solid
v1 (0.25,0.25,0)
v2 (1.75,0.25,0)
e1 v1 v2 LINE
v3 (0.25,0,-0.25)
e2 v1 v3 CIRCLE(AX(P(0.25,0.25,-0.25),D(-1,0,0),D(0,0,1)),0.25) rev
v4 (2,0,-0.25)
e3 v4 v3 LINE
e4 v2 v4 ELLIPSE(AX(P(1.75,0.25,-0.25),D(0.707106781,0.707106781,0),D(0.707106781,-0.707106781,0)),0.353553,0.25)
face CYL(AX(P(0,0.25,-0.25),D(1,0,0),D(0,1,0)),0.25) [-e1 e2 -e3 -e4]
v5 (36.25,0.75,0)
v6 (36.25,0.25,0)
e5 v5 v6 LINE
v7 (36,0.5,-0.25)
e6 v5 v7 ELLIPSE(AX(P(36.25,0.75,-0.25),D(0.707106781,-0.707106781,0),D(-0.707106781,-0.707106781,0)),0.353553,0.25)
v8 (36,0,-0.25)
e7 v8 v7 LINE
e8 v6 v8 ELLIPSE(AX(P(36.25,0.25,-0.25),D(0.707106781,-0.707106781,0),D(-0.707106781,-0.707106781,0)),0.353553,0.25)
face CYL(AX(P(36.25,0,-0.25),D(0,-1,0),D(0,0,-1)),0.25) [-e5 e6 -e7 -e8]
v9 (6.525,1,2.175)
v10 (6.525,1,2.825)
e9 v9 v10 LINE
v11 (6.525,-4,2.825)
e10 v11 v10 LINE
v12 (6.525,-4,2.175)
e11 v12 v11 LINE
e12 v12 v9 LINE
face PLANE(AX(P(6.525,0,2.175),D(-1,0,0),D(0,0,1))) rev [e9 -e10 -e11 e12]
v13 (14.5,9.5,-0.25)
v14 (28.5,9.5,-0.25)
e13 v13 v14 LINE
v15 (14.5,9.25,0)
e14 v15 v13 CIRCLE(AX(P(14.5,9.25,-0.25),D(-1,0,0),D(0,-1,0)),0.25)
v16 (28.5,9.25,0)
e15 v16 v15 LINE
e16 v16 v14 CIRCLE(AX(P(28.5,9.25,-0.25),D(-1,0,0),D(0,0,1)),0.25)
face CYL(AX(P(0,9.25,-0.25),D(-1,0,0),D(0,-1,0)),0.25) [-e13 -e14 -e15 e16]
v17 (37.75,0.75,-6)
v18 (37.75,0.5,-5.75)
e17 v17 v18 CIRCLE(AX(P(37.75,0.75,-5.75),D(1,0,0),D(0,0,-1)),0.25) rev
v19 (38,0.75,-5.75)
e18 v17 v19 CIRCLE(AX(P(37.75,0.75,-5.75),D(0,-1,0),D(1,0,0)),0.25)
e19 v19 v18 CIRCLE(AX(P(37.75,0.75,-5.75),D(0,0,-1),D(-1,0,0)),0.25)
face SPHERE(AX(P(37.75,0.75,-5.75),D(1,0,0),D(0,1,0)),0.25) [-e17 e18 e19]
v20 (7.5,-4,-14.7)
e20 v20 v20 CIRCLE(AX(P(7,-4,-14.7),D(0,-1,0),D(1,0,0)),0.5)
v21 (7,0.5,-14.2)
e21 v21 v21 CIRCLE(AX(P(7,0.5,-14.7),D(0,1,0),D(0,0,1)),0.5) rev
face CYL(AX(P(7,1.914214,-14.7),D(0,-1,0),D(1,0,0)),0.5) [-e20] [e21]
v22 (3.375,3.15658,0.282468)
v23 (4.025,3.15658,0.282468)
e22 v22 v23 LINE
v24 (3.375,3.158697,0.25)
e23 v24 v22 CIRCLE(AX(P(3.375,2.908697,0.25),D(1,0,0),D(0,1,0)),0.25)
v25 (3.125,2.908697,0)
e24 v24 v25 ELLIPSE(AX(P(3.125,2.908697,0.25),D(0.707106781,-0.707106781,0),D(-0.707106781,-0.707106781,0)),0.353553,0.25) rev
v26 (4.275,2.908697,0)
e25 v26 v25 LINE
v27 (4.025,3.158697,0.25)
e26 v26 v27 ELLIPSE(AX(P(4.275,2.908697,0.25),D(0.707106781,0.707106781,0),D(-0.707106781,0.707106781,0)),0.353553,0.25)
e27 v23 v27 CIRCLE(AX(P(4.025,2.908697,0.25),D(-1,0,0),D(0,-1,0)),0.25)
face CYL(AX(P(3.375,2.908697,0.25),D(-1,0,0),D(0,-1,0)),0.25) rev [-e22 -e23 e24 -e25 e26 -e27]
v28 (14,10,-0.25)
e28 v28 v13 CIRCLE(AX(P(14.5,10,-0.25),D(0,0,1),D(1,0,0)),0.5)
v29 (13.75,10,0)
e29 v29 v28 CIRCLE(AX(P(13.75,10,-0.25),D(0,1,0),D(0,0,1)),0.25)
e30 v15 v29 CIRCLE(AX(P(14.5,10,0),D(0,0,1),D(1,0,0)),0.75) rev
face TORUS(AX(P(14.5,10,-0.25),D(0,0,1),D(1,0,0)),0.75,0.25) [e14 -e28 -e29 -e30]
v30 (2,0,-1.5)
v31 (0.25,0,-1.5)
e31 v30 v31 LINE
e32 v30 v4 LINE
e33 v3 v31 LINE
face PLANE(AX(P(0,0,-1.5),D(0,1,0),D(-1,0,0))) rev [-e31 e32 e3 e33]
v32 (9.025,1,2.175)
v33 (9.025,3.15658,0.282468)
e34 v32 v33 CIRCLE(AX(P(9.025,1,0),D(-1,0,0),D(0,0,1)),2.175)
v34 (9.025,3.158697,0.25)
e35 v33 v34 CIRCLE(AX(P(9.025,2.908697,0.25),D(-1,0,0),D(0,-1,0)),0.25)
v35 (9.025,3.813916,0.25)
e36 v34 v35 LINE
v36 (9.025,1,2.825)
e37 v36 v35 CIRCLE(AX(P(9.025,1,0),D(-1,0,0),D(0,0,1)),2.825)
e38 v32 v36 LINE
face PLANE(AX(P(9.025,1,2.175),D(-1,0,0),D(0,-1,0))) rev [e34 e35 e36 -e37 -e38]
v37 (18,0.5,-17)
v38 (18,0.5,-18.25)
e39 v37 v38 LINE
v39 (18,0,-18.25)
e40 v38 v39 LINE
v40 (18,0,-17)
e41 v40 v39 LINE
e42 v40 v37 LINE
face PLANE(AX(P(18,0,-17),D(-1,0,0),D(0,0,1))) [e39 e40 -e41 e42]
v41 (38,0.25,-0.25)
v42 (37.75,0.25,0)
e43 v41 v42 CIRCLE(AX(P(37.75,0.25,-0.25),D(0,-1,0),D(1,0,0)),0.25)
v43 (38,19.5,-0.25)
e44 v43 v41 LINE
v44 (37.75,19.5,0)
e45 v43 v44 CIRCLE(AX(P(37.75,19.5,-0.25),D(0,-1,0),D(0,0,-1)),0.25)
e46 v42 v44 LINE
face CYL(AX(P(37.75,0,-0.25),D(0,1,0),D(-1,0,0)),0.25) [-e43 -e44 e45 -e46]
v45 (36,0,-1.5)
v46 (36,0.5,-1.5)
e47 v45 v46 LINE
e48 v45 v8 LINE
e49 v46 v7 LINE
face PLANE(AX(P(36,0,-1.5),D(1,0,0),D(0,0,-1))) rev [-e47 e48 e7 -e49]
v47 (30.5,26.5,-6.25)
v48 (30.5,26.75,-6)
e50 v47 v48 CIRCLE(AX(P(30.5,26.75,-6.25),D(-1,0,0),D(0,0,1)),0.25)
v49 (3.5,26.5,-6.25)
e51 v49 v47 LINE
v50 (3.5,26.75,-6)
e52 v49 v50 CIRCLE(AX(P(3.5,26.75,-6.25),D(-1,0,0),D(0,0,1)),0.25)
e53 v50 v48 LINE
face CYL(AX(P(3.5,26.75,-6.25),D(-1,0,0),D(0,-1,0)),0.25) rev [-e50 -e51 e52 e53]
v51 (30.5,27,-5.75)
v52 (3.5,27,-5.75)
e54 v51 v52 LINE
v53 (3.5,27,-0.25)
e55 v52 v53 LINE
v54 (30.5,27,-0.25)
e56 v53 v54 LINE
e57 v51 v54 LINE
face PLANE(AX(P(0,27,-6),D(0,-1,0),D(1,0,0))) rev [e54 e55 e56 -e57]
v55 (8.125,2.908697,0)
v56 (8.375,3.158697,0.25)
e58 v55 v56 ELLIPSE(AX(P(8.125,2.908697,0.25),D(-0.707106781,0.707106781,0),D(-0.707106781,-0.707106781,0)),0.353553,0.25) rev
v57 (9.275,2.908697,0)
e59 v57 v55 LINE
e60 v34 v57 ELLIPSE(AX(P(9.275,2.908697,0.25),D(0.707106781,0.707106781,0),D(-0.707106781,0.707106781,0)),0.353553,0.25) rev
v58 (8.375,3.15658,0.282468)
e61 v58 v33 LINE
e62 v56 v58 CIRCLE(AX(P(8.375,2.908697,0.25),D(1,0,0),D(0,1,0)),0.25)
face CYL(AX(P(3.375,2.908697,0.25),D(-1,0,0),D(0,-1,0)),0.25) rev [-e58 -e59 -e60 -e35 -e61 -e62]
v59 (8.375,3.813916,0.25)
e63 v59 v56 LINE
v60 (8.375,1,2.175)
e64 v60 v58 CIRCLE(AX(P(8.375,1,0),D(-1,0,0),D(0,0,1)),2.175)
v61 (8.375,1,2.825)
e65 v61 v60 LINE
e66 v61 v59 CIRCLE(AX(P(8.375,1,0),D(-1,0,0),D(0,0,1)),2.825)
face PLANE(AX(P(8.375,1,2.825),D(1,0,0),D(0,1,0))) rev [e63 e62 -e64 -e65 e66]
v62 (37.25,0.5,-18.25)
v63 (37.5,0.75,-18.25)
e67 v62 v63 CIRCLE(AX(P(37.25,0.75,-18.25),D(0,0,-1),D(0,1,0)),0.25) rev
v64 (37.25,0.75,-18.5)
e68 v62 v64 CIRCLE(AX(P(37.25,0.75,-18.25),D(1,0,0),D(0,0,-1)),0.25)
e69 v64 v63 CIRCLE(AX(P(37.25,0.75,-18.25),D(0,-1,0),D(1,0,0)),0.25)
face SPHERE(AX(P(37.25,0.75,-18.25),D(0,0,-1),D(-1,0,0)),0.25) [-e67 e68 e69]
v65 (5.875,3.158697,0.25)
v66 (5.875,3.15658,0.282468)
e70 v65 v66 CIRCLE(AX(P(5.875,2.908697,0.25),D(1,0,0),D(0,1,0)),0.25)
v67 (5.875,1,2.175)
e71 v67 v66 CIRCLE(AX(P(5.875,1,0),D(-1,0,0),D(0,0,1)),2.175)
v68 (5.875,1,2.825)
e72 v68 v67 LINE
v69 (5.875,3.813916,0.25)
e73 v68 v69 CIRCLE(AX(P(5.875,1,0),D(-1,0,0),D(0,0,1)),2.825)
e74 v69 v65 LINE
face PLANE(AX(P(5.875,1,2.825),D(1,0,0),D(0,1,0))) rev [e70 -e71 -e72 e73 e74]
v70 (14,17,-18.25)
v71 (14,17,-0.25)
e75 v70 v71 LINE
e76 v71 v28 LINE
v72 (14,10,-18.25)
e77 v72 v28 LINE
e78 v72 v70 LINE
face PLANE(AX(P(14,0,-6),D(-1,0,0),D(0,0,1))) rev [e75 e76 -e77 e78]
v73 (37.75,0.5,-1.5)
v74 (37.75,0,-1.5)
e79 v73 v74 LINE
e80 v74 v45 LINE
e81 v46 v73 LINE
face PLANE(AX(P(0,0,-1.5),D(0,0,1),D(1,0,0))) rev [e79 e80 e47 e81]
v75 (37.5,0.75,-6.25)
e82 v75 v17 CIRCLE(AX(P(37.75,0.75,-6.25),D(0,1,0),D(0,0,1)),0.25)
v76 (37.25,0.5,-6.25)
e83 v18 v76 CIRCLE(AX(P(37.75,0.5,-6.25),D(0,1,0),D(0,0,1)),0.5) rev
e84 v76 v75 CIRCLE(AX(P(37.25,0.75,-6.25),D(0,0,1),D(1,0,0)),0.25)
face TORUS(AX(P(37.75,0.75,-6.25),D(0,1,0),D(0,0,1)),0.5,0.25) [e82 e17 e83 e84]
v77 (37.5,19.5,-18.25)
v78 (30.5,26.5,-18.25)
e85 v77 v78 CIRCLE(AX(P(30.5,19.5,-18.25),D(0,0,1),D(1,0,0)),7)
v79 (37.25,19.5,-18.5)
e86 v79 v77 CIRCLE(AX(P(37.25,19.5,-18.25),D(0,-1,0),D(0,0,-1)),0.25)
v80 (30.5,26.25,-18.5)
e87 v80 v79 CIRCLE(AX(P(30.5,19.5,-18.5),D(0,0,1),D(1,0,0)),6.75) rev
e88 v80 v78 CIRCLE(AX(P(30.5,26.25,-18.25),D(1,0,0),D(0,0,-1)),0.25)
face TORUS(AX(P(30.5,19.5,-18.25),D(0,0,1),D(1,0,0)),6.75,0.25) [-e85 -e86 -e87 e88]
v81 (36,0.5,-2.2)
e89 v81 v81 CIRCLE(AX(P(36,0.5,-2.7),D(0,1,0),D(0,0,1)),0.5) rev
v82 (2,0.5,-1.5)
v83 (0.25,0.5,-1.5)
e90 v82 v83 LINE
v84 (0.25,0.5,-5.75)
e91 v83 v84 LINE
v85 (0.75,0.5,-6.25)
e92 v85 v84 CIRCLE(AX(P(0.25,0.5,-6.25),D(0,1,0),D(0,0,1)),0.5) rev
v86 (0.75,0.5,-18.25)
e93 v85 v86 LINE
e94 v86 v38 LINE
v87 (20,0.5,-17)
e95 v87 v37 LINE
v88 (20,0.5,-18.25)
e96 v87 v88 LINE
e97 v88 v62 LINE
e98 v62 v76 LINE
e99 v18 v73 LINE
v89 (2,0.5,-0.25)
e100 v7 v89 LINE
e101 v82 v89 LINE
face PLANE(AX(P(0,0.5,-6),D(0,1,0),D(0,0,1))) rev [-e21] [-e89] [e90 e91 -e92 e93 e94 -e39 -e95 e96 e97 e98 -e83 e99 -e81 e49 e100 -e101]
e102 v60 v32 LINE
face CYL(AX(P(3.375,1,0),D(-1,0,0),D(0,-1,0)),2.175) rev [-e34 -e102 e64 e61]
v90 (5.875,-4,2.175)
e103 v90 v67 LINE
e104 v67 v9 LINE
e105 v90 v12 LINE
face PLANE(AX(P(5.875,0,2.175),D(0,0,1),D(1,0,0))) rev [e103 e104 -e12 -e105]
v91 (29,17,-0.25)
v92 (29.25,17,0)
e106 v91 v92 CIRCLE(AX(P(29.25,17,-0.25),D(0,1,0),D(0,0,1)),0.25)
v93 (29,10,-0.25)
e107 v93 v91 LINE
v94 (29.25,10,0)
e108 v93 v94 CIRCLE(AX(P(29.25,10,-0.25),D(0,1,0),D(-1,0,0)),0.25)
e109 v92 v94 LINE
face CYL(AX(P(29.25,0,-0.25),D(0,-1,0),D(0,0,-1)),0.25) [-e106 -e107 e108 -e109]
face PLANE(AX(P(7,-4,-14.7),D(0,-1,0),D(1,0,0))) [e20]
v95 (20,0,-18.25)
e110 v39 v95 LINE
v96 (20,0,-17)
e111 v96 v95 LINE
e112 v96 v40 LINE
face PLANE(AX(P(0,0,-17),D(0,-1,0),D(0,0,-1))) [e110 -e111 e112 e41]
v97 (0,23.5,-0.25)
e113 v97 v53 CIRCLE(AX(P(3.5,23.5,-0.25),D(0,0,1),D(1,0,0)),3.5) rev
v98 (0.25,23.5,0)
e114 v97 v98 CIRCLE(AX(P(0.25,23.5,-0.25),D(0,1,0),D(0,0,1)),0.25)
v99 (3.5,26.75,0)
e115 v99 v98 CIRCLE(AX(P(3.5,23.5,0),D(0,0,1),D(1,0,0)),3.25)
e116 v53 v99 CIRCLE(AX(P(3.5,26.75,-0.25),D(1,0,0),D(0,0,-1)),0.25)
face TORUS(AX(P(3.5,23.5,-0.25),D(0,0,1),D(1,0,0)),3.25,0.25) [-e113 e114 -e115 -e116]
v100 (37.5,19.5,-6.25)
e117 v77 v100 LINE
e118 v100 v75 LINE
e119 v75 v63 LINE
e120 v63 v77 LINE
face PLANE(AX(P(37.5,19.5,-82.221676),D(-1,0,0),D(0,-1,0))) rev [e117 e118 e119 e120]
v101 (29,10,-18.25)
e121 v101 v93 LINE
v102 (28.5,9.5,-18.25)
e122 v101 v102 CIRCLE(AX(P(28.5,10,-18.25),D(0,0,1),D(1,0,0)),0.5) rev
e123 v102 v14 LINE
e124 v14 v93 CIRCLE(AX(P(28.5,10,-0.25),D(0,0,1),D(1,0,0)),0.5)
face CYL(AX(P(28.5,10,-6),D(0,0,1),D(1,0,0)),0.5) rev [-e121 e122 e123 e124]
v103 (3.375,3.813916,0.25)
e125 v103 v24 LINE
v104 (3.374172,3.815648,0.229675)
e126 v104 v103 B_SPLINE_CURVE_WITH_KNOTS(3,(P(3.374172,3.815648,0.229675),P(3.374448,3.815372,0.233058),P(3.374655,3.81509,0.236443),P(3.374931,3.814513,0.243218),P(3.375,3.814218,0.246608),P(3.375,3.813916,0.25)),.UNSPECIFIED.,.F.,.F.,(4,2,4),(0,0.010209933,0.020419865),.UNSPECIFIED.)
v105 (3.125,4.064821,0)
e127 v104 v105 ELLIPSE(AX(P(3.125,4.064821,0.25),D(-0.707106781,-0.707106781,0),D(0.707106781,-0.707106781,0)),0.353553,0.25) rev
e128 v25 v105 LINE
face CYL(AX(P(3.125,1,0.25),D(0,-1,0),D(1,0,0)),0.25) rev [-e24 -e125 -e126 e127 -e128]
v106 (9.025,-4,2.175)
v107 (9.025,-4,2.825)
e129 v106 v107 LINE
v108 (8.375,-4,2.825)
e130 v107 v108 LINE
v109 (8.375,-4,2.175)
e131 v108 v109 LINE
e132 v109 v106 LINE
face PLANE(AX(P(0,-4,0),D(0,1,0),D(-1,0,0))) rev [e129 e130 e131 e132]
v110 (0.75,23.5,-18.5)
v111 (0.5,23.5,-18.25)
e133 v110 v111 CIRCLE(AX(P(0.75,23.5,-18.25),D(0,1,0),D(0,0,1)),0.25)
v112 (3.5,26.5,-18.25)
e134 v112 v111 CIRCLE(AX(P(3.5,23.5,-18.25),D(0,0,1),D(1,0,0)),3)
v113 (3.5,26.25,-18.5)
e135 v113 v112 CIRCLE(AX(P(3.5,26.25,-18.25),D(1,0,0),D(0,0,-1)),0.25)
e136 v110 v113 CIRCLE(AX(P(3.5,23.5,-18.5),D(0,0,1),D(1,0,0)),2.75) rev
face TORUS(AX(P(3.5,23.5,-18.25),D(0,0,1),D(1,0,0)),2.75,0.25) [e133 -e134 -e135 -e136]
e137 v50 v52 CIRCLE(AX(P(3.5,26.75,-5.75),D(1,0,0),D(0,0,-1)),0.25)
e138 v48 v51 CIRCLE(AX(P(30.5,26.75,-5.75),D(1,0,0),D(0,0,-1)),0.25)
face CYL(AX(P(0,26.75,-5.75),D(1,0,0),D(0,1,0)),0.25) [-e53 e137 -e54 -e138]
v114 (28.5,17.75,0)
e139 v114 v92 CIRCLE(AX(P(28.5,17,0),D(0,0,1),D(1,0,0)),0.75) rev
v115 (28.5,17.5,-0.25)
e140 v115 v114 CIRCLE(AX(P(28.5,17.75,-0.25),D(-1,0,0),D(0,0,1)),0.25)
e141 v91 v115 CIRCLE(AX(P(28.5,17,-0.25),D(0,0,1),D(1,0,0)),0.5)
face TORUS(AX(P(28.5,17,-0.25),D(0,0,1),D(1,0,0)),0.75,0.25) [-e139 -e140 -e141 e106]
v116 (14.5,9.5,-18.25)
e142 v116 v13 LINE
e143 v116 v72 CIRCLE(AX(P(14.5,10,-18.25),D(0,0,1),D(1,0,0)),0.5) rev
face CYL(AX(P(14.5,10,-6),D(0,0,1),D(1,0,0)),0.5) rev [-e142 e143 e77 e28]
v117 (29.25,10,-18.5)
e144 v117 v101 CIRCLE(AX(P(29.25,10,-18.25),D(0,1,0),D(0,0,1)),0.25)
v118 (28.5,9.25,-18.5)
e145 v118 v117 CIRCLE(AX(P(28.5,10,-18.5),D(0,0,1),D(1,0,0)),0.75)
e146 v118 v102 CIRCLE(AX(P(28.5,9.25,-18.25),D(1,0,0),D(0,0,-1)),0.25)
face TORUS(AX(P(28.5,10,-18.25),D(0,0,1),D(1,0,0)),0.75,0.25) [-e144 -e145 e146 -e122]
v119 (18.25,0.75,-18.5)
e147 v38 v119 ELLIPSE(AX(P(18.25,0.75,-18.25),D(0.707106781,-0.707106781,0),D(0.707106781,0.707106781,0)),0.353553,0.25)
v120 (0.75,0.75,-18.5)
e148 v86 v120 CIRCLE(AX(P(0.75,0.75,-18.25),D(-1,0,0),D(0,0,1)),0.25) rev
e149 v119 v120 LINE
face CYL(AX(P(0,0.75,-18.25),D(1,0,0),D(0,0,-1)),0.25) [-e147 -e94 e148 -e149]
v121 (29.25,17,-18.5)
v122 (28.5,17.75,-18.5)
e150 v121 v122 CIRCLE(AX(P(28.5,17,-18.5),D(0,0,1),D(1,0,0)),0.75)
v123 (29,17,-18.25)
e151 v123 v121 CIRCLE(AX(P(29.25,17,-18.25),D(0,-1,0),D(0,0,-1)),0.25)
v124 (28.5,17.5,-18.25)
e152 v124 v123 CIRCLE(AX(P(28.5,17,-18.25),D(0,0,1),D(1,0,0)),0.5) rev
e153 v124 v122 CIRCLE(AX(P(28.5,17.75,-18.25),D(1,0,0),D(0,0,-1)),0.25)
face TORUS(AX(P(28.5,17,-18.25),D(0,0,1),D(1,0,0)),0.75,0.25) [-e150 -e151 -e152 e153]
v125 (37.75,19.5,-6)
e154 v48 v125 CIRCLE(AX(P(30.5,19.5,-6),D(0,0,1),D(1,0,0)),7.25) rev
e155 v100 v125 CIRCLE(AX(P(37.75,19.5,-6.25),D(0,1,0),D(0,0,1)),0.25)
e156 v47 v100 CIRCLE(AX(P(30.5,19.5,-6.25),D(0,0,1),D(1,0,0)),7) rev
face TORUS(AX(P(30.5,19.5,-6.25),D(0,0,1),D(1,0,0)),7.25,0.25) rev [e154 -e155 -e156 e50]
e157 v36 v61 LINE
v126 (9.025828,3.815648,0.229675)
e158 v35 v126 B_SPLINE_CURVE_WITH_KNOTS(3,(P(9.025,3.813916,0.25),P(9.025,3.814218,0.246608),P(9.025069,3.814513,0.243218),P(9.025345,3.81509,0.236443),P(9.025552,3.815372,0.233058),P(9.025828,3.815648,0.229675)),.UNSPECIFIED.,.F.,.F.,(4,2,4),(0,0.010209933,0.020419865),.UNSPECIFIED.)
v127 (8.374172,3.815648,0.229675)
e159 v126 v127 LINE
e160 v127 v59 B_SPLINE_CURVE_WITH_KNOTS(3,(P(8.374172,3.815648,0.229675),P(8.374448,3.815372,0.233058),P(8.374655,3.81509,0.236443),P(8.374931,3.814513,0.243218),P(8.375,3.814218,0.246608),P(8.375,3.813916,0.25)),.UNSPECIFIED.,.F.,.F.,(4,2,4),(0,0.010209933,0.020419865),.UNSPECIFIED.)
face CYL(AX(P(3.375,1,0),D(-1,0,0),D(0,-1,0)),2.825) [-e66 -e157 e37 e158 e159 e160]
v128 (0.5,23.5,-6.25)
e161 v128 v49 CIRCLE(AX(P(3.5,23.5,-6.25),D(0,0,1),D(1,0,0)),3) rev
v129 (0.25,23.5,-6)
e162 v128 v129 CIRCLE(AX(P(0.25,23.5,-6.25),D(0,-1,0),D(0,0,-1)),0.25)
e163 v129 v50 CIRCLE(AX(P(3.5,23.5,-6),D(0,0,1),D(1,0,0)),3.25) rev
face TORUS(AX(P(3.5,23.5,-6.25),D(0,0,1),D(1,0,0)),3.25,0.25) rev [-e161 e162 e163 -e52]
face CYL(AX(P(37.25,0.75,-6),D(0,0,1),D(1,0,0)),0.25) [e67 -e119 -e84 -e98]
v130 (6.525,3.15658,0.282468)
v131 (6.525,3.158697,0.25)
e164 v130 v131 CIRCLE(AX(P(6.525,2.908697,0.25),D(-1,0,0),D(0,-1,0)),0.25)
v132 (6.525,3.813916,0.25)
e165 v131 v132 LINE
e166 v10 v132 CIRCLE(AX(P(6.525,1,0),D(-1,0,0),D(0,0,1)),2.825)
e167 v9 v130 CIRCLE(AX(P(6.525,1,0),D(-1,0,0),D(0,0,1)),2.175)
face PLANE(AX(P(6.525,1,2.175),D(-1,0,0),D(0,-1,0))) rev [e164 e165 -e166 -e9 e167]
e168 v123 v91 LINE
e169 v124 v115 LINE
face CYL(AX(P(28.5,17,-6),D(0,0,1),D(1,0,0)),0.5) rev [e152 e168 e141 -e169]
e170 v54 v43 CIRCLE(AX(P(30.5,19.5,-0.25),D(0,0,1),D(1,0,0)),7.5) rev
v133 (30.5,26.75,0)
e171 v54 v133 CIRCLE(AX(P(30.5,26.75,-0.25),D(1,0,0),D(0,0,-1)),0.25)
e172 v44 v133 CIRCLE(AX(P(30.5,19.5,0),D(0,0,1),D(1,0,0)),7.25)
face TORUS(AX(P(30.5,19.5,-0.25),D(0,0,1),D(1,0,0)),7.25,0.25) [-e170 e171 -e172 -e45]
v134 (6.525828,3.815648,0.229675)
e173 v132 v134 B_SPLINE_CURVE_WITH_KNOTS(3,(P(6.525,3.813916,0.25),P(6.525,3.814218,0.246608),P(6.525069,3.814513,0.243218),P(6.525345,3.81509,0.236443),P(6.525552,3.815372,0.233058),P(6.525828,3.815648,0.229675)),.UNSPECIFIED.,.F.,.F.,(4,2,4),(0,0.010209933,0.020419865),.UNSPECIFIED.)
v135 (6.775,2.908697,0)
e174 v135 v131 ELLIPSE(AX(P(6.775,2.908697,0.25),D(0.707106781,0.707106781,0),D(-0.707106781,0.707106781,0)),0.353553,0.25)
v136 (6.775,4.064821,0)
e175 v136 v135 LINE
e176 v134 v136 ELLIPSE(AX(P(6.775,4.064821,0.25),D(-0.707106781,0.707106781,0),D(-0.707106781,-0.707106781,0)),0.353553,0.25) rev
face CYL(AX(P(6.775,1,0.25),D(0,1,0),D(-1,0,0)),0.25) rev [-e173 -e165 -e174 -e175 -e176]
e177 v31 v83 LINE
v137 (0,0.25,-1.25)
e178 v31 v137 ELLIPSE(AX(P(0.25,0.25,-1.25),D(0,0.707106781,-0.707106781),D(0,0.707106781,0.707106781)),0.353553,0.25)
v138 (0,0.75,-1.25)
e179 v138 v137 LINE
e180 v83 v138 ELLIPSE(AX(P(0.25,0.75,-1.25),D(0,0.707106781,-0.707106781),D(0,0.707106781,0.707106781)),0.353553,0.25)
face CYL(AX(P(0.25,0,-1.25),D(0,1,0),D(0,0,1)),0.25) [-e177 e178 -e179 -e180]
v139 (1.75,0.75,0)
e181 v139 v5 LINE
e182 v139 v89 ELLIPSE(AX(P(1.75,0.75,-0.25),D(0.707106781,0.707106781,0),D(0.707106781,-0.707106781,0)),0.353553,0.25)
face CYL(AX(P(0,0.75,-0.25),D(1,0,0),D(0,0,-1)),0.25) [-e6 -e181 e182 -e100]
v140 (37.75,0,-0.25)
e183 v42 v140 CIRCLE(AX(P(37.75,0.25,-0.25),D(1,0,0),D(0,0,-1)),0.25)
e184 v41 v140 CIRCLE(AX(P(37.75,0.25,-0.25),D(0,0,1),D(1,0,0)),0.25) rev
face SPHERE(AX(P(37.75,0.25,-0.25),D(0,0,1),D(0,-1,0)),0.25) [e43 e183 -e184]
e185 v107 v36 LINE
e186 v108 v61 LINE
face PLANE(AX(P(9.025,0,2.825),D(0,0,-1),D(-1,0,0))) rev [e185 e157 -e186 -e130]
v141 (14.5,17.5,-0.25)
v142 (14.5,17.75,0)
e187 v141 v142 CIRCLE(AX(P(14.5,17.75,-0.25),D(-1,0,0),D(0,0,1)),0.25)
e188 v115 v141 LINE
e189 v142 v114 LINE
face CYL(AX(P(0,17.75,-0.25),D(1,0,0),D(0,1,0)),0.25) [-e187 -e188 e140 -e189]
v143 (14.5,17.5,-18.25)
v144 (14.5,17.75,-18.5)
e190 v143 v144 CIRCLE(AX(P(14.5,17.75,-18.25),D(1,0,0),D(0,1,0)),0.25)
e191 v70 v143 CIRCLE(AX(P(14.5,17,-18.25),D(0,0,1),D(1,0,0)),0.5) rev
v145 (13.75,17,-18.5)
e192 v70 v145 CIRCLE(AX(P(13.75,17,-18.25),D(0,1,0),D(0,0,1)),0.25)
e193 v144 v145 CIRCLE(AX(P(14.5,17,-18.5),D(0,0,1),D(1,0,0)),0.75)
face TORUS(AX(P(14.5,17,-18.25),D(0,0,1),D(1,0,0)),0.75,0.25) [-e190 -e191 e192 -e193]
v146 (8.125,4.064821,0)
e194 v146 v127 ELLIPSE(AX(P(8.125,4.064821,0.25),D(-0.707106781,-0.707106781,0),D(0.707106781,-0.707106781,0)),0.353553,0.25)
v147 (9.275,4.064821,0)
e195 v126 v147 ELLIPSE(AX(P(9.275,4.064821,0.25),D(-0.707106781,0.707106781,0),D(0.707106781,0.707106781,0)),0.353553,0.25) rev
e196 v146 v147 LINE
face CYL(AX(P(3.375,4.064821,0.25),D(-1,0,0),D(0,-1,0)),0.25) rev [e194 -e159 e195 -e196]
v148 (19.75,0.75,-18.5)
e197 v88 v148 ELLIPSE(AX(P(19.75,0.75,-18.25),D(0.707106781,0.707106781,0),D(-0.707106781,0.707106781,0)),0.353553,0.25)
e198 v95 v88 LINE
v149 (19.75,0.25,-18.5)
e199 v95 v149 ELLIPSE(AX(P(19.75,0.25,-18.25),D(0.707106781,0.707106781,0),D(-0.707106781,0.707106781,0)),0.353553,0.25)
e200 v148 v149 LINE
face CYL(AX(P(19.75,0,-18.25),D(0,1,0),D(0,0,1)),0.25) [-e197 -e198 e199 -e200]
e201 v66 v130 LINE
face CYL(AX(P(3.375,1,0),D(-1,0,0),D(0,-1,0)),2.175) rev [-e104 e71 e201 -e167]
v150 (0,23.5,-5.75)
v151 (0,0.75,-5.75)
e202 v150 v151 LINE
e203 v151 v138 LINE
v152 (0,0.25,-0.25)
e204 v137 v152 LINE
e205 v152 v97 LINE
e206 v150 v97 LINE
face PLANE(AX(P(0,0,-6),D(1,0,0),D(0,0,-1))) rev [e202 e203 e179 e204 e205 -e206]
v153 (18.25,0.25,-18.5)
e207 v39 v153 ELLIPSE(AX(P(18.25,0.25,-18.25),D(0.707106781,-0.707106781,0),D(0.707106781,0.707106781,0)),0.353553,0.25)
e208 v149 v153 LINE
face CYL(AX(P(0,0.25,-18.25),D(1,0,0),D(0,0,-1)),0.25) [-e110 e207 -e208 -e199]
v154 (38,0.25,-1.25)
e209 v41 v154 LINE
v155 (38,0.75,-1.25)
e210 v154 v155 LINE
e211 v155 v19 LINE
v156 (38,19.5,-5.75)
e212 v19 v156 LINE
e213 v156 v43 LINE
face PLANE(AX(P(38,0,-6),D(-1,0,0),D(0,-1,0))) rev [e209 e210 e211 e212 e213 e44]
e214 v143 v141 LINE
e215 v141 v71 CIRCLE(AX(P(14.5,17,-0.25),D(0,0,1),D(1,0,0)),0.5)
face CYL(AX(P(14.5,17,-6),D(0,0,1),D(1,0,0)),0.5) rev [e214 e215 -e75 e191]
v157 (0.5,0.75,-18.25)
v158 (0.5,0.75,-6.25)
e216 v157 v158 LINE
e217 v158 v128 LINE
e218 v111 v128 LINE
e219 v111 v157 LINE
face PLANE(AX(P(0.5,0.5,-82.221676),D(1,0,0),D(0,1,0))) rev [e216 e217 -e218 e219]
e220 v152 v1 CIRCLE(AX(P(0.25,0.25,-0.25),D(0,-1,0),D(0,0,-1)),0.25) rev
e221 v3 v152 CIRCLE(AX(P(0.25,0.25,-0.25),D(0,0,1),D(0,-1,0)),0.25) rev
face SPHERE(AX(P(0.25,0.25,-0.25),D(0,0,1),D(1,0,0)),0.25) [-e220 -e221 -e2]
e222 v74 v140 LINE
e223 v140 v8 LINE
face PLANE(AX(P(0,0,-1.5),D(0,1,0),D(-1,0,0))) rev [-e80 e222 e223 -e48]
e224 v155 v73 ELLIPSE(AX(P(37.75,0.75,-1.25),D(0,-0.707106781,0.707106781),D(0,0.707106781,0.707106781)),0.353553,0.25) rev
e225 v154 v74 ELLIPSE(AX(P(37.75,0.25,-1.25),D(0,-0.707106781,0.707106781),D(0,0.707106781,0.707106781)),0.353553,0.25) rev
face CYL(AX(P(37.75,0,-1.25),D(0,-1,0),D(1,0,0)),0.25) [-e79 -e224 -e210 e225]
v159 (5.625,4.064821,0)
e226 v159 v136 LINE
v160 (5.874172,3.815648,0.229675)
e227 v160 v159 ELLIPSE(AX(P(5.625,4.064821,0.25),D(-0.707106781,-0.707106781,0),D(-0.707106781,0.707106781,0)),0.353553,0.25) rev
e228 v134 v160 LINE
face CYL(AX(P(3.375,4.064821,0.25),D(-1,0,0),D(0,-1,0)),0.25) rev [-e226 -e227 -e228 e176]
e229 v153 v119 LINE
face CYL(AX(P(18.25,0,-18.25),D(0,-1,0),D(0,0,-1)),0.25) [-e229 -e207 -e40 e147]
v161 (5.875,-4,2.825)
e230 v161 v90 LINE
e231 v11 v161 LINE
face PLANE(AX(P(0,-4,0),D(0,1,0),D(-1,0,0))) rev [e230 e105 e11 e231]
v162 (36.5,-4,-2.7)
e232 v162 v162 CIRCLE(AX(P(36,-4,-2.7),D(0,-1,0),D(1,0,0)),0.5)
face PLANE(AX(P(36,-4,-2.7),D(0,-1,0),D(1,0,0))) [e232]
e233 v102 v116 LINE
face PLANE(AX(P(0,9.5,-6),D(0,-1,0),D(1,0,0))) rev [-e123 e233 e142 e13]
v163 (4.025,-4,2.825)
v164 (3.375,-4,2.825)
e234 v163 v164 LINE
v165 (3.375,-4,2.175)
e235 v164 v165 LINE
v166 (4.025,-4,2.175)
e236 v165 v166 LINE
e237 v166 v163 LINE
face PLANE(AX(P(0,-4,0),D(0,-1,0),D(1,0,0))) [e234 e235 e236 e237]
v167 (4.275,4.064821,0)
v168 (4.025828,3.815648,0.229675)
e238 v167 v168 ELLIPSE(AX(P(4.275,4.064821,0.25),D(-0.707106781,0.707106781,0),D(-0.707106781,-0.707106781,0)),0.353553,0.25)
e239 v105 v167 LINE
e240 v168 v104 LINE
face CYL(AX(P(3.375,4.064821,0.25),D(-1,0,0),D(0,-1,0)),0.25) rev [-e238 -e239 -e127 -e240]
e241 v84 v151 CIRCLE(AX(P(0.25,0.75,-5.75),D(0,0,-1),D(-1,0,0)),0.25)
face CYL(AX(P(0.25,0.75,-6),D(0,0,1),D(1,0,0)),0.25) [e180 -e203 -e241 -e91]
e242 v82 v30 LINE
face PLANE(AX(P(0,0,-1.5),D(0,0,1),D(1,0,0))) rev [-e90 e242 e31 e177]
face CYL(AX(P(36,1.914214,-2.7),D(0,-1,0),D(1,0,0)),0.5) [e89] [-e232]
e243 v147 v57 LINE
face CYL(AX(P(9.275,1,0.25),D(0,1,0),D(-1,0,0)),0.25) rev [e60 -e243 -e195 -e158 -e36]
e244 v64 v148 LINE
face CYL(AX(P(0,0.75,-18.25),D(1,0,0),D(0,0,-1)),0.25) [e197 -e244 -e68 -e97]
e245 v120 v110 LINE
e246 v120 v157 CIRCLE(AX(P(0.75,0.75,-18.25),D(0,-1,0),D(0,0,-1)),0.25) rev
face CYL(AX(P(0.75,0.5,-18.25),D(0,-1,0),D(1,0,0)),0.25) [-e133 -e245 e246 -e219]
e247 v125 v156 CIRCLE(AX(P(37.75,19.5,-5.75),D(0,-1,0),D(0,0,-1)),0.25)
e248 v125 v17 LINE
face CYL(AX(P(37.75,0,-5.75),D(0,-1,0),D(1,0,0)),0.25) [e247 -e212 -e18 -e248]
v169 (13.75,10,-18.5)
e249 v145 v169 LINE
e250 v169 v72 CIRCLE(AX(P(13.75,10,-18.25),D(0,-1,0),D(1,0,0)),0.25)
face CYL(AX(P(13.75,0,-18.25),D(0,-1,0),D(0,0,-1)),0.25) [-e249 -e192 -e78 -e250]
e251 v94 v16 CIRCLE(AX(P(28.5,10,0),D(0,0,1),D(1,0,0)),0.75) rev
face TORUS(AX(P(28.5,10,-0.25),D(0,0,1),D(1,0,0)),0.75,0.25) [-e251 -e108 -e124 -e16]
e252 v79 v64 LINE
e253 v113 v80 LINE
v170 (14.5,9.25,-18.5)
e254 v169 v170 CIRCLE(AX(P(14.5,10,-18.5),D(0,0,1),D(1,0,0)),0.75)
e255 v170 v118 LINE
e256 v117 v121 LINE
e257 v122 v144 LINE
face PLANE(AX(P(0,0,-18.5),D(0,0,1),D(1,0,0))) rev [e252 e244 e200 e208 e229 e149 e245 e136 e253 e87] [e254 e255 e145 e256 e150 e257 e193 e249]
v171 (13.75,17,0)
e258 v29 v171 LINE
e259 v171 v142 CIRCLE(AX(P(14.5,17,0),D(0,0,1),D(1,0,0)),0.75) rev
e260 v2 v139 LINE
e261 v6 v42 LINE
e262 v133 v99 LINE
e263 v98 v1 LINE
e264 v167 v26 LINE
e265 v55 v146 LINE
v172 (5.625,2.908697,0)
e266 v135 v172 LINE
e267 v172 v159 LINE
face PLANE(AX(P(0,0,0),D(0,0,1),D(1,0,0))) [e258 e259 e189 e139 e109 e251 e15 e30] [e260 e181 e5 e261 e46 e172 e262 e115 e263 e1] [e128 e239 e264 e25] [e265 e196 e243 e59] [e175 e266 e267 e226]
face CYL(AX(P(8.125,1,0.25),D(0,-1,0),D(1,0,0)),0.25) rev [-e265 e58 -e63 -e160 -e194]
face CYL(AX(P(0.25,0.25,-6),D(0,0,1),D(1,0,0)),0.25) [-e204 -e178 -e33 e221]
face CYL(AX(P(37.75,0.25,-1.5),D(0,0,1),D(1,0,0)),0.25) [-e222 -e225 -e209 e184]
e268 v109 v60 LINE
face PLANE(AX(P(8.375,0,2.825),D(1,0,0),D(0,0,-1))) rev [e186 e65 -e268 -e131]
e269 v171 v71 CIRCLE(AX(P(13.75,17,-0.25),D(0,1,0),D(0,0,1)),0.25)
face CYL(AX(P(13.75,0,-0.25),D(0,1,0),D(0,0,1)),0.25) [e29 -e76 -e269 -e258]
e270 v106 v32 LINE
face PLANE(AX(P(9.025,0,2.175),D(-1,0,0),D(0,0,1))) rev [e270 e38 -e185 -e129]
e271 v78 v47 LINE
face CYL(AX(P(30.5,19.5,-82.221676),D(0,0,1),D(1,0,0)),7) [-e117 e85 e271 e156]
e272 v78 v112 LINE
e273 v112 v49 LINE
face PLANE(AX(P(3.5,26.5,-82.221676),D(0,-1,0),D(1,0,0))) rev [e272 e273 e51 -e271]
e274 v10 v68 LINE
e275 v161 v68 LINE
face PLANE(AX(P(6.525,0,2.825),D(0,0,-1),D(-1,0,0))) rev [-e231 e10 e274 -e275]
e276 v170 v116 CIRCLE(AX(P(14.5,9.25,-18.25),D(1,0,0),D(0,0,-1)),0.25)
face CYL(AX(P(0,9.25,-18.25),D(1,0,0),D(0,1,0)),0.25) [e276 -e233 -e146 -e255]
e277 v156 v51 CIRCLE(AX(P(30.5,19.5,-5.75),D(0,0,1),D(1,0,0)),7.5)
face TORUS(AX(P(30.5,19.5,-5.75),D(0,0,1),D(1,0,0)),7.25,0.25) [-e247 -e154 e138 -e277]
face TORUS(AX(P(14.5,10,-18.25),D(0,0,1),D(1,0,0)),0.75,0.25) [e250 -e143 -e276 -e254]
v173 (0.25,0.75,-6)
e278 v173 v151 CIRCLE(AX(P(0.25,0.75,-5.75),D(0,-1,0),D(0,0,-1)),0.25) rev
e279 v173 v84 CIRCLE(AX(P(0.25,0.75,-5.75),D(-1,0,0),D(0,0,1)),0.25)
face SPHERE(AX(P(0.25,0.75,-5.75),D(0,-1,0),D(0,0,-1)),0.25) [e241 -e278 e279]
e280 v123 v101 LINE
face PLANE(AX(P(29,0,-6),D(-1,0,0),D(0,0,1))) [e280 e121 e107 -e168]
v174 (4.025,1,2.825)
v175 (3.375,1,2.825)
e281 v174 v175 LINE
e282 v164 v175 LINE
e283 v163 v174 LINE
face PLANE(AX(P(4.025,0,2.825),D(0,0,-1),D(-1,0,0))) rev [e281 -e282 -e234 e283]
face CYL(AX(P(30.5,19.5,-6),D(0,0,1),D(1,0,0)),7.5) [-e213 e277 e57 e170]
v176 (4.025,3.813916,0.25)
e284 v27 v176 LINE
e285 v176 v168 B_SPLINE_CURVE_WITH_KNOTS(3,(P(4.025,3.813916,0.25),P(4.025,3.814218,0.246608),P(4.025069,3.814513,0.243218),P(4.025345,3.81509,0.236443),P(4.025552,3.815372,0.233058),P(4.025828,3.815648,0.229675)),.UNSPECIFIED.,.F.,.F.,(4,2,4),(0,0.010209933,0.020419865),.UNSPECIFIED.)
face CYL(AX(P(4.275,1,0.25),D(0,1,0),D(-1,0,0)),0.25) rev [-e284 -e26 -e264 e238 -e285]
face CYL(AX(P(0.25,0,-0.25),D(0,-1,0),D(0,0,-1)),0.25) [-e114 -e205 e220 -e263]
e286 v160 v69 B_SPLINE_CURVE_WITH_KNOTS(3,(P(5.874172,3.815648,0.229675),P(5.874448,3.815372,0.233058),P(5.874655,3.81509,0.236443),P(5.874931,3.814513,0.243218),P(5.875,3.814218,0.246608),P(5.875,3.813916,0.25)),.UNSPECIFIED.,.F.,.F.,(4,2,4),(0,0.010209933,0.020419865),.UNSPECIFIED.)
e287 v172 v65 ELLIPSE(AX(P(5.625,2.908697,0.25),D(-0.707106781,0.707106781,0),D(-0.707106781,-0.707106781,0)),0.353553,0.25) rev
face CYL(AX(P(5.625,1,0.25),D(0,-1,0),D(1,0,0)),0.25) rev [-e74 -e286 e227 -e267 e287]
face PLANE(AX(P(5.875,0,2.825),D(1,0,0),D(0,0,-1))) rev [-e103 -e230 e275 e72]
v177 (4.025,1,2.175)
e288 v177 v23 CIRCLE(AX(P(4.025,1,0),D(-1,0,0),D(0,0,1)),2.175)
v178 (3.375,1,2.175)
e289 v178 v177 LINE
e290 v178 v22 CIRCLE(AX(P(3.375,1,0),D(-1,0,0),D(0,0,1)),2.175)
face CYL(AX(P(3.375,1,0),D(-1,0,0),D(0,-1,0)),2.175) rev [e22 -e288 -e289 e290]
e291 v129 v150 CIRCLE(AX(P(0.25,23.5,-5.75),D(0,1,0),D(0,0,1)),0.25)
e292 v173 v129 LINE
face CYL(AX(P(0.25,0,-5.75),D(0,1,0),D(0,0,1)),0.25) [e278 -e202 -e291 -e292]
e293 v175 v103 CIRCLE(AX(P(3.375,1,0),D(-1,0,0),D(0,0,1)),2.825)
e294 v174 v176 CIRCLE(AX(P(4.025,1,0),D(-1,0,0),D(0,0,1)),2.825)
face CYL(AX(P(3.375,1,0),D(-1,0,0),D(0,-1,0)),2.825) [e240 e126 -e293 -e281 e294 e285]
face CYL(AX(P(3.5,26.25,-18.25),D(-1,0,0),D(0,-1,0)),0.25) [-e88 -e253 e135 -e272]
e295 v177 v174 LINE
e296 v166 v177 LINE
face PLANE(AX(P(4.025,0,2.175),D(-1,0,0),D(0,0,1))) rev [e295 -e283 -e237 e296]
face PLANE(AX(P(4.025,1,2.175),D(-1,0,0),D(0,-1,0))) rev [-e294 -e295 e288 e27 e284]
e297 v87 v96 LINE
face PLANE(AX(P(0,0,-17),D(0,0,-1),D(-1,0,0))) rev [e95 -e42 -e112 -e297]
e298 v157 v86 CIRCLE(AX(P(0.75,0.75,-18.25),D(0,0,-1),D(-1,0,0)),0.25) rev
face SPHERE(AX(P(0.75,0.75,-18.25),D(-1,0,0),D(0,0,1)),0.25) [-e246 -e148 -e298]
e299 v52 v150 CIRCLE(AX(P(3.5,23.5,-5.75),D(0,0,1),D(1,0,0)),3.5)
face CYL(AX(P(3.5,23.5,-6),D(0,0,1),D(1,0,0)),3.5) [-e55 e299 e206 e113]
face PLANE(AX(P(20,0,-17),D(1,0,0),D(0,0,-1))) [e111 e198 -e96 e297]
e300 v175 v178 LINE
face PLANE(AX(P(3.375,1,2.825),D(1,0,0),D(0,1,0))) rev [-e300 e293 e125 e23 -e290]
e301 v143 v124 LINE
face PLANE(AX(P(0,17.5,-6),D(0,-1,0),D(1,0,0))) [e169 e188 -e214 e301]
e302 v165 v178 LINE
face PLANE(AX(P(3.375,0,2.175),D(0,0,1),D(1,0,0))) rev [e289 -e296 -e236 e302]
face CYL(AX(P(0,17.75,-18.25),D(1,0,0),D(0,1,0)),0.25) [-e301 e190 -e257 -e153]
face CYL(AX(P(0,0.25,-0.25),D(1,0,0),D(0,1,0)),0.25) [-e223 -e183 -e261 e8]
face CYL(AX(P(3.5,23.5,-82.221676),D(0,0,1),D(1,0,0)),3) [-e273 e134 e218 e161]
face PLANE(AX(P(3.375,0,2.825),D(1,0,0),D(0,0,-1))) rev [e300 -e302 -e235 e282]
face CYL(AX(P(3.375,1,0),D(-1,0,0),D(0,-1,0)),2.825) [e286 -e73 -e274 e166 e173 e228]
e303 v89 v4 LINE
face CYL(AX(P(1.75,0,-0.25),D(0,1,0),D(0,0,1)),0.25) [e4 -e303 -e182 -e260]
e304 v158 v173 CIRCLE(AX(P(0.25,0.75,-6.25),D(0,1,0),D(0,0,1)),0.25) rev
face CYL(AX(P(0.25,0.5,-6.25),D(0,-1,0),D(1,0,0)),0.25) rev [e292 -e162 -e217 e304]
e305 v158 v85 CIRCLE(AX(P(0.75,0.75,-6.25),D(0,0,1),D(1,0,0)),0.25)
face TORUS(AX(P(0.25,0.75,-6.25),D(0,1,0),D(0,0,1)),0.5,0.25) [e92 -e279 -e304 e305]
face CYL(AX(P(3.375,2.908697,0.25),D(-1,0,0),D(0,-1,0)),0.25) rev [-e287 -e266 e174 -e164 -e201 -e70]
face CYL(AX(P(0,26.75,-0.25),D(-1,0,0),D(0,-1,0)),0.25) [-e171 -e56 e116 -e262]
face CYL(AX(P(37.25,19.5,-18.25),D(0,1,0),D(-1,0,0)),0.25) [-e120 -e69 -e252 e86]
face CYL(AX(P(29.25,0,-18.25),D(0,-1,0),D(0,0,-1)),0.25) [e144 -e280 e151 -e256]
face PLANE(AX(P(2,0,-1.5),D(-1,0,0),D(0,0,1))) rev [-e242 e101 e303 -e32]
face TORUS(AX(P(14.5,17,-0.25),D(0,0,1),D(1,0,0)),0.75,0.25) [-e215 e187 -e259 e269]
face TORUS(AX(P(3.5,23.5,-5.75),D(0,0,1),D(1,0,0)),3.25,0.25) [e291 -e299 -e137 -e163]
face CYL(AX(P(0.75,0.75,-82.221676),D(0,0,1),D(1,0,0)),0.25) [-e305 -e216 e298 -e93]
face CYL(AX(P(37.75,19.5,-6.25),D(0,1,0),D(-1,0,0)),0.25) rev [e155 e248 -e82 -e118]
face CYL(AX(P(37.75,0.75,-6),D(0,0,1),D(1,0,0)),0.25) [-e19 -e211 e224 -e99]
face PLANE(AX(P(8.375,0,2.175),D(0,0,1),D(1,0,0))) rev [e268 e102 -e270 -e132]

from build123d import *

# Parameters (mm, degrees)
BOSS_EXTRUDE1_DEPTH      = 6
SKETCH1_3_W              = 2
SKETCH1_3_H              = 0.5
BOSS_EXTRUDE2_DEPTH      = 1.5
BOSS_EXTRUDE3_DEPTH      = 12.5
BOSS_EXTRUDE4_START      = -18.5
SKETCH1_4_W              = 2
SKETCH1_4_H              = 0.5
BOSS_EXTRUDE4_DEPTH      = 1.5
BOSS_EXTRUDE5_DEPTH      = 4
BOSS_EXTRUDE5_DEPTH_BACK = 0.5
SKETCH3_R                = 0.5
SKETCH3_W                = 0.65
SKETCH3_H                = 0.65
SKETCH5_W                = 0.65
SKETCH5_H                = 0.65
FILLET1_R                = 0.25


with BuildPart() as part:
    # Sketch1 → Boss-Extrude1 (new body)
    with BuildSketch(Plane.XY):
        with BuildLine():
            Line((0, 23.5), (0, 0.5))
            Line((0, 0.5), (2, 0.5))
            Line((2, 0.5), (18, 0.5))
            Line((18, 0.5), (20, 0.5))
            Line((20, 0.5), (36, 0.5))
            Line((36, 0.5), (38, 0.5))
            Line((38, 0.5), (38, 19.5))
            ThreePointArc((38, 19.5), (35.803300859, 24.803300859), (30.5, 27))
            Line((30.5, 27), (3.5, 27))
            ThreePointArc((3.5, 27), (1.025126266, 25.974873734), (0, 23.5))
        make_face()
        with BuildLine():
            ThreePointArc((14, 17), (14.146446609, 17.353553391), (14.5, 17.5))
            Line((14.5, 17.5), (28.5, 17.5))
            ThreePointArc((28.5, 17.5), (28.853553391, 17.353553391), (29, 17))
            Line((29, 17), (29, 10))
            ThreePointArc((29, 10), (28.853553391, 9.646446609), (28.5, 9.5))
            Line((28.5, 9.5), (14.5, 9.5))
            ThreePointArc((14.5, 9.5), (14.146446609, 9.646446609), (14, 10))
            Line((14, 10), (14, 17))
        make_face(mode=Mode.SUBTRACT)
    extrude(amount=-BOSS_EXTRUDE1_DEPTH)

    # Sketch1<3> → Boss-Extrude2 (add)
    with BuildSketch(Plane.XY):
        with Locations((1, 0.25)):
            Rectangle(SKETCH1_3_W, SKETCH1_3_H)
        with Locations((37, 0.25)):
            Rectangle(SKETCH1_3_W, SKETCH1_3_H)
    extrude(amount=-BOSS_EXTRUDE2_DEPTH)

    # Sketch2 → Boss-Extrude3 (add)
    with BuildSketch(Plane(origin=(0, 0, -6), x_dir=(-1, 0, 0), z_dir=(0, 0, -1))):
        with BuildLine():
            Line((-37.5, 0.5), (-0.5, 0.5))
            Line((-0.5, 0.5), (-0.5, 23.5))
            ThreePointArc((-0.5, 23.5), (-1.378679656, 25.621320344), (-3.5, 26.5))
            Line((-3.5, 26.5), (-30.5, 26.5))
            ThreePointArc((-30.5, 26.5), (-35.449747468, 24.449747468), (-37.5, 19.5))
            Line((-37.5, 19.5), (-37.5, 0.5))
        make_face()
        with BuildLine():
            Line((-14.5, 17.5), (-28.5, 17.5))
            ThreePointArc((-28.5, 17.5), (-28.853553391, 17.353553391), (-29, 17))
            Line((-29, 17), (-29, 10))
            ThreePointArc((-29, 10), (-28.853553391, 9.646446609), (-28.5, 9.5))
            Line((-28.5, 9.5), (-14.5, 9.5))
            ThreePointArc((-14.5, 9.5), (-14.146446609, 9.646446609), (-14, 10))
            Line((-14, 10), (-14, 17))
            ThreePointArc((-14, 17), (-14.146446609, 17.353553391), (-14.5, 17.5))
        make_face(mode=Mode.SUBTRACT)
    extrude(amount=BOSS_EXTRUDE3_DEPTH)

    # Sketch1<4> → Boss-Extrude4 (add)
    with BuildSketch(Plane.XY.offset(BOSS_EXTRUDE4_START)):
        with Locations((19, 0.25)):
            Rectangle(SKETCH1_4_W, SKETCH1_4_H)
    extrude(amount=BOSS_EXTRUDE4_DEPTH)

    # Sketch3 → Boss-Extrude5 (add, two sides: drawn at the far end of the back side and taken through both)
    with BuildSketch(Plane.XZ.offset(-BOSS_EXTRUDE5_DEPTH_BACK)):
        with Locations((7, -14.7)):
            Circle(SKETCH3_R)
        with Locations((36, -2.7)):
            Circle(SKETCH3_R)
        with Locations((6.2, 2.5)):
            Rectangle(SKETCH3_W, SKETCH3_H)
        with Locations((3.7, 2.5)):
            Rectangle(SKETCH3_W, SKETCH3_H)
        with Locations((8.7, 2.5)):
            Rectangle(SKETCH3_W, SKETCH3_H)
    extrude(amount=BOSS_EXTRUDE5_DEPTH + BOSS_EXTRUDE5_DEPTH_BACK)


with BuildPart() as boss_extrude5_piece_1:
    # of the separate pieces the step leaves, piece 1, a body of its own (boss_extrude5_pieces)
    add(part.part.solids().sort_by_distance((0, 23.5, 0))[0])



with BuildPart() as boss_extrude5_piece_2:
    # of the separate pieces the step leaves, piece 2, a body of its own (boss_extrude5_pieces)
    add(part.part.solids().sort_by_distance((8.375, -4, 2.825))[0])


with BuildPart() as boss_extrude5_piece_3:
    # of the separate pieces the step leaves, piece 3, a body of its own (boss_extrude5_pieces)
    add(part.part.solids().sort_by_distance((3.375, -4, 2.825))[0])


with BuildPart() as boss_extrude5_piece_4:
    # of the separate pieces the step leaves, piece 4, a body of its own (boss_extrude5_pieces)
    add(part.part.solids().sort_by_distance((5.875, -4, 2.825))[0])


with BuildPart() as boss_extrude5_piece_1_1:
    add(boss_extrude5_piece_1.part)

    add(boss_extrude5_piece_2.part)  # Sweep2 merges Boss-Extrude5 piece 2

    add(boss_extrude5_piece_3.part)  # Sweep2 merges Boss-Extrude5 piece 3

    add(boss_extrude5_piece_4.part)  # Sweep2 merges Boss-Extrude5 piece 4
    # Sweep2: sweep along a path in Sketch4
    with BuildLine(Plane.ZY.offset(-3.375)) as sweep2_path:
        Line((2.175, 0), (2.175, 1))
        ThreePointArc((2.175, 1), (1.537957249, 2.537957249), (0, 3.175))
    # Sketch5 → Sweep2 (sweep)
    with BuildSketch(Plane.XZ):
        with Locations((8.7, 2.5)):
            Rectangle(SKETCH5_W, SKETCH5_H)
        with Locations((6.2, 2.5)):
            Rectangle(SKETCH5_W, SKETCH5_H)
        with Locations((3.7, 2.5)):
            Rectangle(SKETCH5_W, SKETCH5_H)
    sweep(path=sweep2_path.line)

    # Fillet1
    fillet1_edges = [boss_extrude5_piece_1_1.edges().sort_by_distance(p)[0] for p in [
        (1.378679656, 25.621320344, -6),
        (17, 26.5, -6),
        (37.5, 10, -6),
        (0.5, 12, -6),
        (3.7, 3.175, 0),
        (4.025, 3.5, 0),
        (3.7, 3.825, 0),
        (3.375, 3.5, 0),
        (5.875, 3.5, 0),
        (6.2, 3.175, 0),
        (6.525, 3.5, 0),
        (6.2, 3.825, 0),
        (8.7, 3.825, 0),
        (8.375, 3.5, 0),
        (8.7, 3.175, 0),
        (9.025, 3.5, 0),
        (35.449747468, 24.449747468, -6),
    ]]
    fillet(fillet1_edges, radius=FILLET1_R)
    fillet1_2_edges = [boss_extrude5_piece_1_1.edges().sort_by_distance(p)[0] for p in [
        (1.025126266, 25.974873734, -6),
        (17, 27, -6),
        (35.803300859, 24.803300859, -6),
        (37.5, 0.5, -12.375),
        (0.5, 0.5, -12.375),
        (0, 0, -0.75),
        (0, 0.25, -1.5),
        (0, 0.5, -3.75),
        (0, 12, -6),
        (38, 10, -6),
        (38, 0.5, -3.75),
        (38, 0.25, -1.5),
        (38, 0, -0.75),
        (14.146446609, 17.353553391, 0),
        (14.146446609, 17.353553391, -18.5),
        (14, 13.5, 0),
        (14, 13.5, -18.5),
        (14.146446609, 9.646446609, 0),
        (14.146446609, 9.646446609, -18.5),
        (21.5, 9.5, 0),
        (21.5, 9.5, -18.5),
        (28.853553391, 9.646446609, 0),
        (28.853553391, 9.646446609, -18.5),
        (29, 13.5, 0),
        (29, 13.5, -18.5),
        (28.853553391, 17.353553391, 0),
        (28.853553391, 17.353553391, -18.5),
        (21.5, 17.5, 0),
        (21.5, 17.5, -18.5),
        (38, 9.75, 0),
        (37, 0, 0),
        (36, 0.25, 0),
        (19, 0.5, 0),
        (2, 0.25, 0),
        (1, 0, 0),
        (0, 11.75, 0),
        (1.025126266, 25.974873734, 0),
        (17, 27, 0),
        (35.803300859, 24.803300859, 0),
        (0.5, 12, -18.5),
        (9.25, 0.5, -18.5),
        (18, 0.25, -18.5),
        (19, 0, -18.5),
        (20, 0.25, -18.5),
        (28.75, 0.5, -18.5),
        (37.5, 10, -18.5),
        (35.449747468, 24.449747468, -18.5),
        (17, 26.5, -18.5),
        (1.378679656, 25.621320344, -18.5),
        (0.426776695, 0.5, -6.073223305),
        (37.573223305, 0.5, -6.073223305),
    ]]
    fillet(fillet1_2_edges, radius=FILLET1_R - 0.0001)  # a hair under: the kernel refuses the full size


solid = boss_extrude5_piece_1_1.part
